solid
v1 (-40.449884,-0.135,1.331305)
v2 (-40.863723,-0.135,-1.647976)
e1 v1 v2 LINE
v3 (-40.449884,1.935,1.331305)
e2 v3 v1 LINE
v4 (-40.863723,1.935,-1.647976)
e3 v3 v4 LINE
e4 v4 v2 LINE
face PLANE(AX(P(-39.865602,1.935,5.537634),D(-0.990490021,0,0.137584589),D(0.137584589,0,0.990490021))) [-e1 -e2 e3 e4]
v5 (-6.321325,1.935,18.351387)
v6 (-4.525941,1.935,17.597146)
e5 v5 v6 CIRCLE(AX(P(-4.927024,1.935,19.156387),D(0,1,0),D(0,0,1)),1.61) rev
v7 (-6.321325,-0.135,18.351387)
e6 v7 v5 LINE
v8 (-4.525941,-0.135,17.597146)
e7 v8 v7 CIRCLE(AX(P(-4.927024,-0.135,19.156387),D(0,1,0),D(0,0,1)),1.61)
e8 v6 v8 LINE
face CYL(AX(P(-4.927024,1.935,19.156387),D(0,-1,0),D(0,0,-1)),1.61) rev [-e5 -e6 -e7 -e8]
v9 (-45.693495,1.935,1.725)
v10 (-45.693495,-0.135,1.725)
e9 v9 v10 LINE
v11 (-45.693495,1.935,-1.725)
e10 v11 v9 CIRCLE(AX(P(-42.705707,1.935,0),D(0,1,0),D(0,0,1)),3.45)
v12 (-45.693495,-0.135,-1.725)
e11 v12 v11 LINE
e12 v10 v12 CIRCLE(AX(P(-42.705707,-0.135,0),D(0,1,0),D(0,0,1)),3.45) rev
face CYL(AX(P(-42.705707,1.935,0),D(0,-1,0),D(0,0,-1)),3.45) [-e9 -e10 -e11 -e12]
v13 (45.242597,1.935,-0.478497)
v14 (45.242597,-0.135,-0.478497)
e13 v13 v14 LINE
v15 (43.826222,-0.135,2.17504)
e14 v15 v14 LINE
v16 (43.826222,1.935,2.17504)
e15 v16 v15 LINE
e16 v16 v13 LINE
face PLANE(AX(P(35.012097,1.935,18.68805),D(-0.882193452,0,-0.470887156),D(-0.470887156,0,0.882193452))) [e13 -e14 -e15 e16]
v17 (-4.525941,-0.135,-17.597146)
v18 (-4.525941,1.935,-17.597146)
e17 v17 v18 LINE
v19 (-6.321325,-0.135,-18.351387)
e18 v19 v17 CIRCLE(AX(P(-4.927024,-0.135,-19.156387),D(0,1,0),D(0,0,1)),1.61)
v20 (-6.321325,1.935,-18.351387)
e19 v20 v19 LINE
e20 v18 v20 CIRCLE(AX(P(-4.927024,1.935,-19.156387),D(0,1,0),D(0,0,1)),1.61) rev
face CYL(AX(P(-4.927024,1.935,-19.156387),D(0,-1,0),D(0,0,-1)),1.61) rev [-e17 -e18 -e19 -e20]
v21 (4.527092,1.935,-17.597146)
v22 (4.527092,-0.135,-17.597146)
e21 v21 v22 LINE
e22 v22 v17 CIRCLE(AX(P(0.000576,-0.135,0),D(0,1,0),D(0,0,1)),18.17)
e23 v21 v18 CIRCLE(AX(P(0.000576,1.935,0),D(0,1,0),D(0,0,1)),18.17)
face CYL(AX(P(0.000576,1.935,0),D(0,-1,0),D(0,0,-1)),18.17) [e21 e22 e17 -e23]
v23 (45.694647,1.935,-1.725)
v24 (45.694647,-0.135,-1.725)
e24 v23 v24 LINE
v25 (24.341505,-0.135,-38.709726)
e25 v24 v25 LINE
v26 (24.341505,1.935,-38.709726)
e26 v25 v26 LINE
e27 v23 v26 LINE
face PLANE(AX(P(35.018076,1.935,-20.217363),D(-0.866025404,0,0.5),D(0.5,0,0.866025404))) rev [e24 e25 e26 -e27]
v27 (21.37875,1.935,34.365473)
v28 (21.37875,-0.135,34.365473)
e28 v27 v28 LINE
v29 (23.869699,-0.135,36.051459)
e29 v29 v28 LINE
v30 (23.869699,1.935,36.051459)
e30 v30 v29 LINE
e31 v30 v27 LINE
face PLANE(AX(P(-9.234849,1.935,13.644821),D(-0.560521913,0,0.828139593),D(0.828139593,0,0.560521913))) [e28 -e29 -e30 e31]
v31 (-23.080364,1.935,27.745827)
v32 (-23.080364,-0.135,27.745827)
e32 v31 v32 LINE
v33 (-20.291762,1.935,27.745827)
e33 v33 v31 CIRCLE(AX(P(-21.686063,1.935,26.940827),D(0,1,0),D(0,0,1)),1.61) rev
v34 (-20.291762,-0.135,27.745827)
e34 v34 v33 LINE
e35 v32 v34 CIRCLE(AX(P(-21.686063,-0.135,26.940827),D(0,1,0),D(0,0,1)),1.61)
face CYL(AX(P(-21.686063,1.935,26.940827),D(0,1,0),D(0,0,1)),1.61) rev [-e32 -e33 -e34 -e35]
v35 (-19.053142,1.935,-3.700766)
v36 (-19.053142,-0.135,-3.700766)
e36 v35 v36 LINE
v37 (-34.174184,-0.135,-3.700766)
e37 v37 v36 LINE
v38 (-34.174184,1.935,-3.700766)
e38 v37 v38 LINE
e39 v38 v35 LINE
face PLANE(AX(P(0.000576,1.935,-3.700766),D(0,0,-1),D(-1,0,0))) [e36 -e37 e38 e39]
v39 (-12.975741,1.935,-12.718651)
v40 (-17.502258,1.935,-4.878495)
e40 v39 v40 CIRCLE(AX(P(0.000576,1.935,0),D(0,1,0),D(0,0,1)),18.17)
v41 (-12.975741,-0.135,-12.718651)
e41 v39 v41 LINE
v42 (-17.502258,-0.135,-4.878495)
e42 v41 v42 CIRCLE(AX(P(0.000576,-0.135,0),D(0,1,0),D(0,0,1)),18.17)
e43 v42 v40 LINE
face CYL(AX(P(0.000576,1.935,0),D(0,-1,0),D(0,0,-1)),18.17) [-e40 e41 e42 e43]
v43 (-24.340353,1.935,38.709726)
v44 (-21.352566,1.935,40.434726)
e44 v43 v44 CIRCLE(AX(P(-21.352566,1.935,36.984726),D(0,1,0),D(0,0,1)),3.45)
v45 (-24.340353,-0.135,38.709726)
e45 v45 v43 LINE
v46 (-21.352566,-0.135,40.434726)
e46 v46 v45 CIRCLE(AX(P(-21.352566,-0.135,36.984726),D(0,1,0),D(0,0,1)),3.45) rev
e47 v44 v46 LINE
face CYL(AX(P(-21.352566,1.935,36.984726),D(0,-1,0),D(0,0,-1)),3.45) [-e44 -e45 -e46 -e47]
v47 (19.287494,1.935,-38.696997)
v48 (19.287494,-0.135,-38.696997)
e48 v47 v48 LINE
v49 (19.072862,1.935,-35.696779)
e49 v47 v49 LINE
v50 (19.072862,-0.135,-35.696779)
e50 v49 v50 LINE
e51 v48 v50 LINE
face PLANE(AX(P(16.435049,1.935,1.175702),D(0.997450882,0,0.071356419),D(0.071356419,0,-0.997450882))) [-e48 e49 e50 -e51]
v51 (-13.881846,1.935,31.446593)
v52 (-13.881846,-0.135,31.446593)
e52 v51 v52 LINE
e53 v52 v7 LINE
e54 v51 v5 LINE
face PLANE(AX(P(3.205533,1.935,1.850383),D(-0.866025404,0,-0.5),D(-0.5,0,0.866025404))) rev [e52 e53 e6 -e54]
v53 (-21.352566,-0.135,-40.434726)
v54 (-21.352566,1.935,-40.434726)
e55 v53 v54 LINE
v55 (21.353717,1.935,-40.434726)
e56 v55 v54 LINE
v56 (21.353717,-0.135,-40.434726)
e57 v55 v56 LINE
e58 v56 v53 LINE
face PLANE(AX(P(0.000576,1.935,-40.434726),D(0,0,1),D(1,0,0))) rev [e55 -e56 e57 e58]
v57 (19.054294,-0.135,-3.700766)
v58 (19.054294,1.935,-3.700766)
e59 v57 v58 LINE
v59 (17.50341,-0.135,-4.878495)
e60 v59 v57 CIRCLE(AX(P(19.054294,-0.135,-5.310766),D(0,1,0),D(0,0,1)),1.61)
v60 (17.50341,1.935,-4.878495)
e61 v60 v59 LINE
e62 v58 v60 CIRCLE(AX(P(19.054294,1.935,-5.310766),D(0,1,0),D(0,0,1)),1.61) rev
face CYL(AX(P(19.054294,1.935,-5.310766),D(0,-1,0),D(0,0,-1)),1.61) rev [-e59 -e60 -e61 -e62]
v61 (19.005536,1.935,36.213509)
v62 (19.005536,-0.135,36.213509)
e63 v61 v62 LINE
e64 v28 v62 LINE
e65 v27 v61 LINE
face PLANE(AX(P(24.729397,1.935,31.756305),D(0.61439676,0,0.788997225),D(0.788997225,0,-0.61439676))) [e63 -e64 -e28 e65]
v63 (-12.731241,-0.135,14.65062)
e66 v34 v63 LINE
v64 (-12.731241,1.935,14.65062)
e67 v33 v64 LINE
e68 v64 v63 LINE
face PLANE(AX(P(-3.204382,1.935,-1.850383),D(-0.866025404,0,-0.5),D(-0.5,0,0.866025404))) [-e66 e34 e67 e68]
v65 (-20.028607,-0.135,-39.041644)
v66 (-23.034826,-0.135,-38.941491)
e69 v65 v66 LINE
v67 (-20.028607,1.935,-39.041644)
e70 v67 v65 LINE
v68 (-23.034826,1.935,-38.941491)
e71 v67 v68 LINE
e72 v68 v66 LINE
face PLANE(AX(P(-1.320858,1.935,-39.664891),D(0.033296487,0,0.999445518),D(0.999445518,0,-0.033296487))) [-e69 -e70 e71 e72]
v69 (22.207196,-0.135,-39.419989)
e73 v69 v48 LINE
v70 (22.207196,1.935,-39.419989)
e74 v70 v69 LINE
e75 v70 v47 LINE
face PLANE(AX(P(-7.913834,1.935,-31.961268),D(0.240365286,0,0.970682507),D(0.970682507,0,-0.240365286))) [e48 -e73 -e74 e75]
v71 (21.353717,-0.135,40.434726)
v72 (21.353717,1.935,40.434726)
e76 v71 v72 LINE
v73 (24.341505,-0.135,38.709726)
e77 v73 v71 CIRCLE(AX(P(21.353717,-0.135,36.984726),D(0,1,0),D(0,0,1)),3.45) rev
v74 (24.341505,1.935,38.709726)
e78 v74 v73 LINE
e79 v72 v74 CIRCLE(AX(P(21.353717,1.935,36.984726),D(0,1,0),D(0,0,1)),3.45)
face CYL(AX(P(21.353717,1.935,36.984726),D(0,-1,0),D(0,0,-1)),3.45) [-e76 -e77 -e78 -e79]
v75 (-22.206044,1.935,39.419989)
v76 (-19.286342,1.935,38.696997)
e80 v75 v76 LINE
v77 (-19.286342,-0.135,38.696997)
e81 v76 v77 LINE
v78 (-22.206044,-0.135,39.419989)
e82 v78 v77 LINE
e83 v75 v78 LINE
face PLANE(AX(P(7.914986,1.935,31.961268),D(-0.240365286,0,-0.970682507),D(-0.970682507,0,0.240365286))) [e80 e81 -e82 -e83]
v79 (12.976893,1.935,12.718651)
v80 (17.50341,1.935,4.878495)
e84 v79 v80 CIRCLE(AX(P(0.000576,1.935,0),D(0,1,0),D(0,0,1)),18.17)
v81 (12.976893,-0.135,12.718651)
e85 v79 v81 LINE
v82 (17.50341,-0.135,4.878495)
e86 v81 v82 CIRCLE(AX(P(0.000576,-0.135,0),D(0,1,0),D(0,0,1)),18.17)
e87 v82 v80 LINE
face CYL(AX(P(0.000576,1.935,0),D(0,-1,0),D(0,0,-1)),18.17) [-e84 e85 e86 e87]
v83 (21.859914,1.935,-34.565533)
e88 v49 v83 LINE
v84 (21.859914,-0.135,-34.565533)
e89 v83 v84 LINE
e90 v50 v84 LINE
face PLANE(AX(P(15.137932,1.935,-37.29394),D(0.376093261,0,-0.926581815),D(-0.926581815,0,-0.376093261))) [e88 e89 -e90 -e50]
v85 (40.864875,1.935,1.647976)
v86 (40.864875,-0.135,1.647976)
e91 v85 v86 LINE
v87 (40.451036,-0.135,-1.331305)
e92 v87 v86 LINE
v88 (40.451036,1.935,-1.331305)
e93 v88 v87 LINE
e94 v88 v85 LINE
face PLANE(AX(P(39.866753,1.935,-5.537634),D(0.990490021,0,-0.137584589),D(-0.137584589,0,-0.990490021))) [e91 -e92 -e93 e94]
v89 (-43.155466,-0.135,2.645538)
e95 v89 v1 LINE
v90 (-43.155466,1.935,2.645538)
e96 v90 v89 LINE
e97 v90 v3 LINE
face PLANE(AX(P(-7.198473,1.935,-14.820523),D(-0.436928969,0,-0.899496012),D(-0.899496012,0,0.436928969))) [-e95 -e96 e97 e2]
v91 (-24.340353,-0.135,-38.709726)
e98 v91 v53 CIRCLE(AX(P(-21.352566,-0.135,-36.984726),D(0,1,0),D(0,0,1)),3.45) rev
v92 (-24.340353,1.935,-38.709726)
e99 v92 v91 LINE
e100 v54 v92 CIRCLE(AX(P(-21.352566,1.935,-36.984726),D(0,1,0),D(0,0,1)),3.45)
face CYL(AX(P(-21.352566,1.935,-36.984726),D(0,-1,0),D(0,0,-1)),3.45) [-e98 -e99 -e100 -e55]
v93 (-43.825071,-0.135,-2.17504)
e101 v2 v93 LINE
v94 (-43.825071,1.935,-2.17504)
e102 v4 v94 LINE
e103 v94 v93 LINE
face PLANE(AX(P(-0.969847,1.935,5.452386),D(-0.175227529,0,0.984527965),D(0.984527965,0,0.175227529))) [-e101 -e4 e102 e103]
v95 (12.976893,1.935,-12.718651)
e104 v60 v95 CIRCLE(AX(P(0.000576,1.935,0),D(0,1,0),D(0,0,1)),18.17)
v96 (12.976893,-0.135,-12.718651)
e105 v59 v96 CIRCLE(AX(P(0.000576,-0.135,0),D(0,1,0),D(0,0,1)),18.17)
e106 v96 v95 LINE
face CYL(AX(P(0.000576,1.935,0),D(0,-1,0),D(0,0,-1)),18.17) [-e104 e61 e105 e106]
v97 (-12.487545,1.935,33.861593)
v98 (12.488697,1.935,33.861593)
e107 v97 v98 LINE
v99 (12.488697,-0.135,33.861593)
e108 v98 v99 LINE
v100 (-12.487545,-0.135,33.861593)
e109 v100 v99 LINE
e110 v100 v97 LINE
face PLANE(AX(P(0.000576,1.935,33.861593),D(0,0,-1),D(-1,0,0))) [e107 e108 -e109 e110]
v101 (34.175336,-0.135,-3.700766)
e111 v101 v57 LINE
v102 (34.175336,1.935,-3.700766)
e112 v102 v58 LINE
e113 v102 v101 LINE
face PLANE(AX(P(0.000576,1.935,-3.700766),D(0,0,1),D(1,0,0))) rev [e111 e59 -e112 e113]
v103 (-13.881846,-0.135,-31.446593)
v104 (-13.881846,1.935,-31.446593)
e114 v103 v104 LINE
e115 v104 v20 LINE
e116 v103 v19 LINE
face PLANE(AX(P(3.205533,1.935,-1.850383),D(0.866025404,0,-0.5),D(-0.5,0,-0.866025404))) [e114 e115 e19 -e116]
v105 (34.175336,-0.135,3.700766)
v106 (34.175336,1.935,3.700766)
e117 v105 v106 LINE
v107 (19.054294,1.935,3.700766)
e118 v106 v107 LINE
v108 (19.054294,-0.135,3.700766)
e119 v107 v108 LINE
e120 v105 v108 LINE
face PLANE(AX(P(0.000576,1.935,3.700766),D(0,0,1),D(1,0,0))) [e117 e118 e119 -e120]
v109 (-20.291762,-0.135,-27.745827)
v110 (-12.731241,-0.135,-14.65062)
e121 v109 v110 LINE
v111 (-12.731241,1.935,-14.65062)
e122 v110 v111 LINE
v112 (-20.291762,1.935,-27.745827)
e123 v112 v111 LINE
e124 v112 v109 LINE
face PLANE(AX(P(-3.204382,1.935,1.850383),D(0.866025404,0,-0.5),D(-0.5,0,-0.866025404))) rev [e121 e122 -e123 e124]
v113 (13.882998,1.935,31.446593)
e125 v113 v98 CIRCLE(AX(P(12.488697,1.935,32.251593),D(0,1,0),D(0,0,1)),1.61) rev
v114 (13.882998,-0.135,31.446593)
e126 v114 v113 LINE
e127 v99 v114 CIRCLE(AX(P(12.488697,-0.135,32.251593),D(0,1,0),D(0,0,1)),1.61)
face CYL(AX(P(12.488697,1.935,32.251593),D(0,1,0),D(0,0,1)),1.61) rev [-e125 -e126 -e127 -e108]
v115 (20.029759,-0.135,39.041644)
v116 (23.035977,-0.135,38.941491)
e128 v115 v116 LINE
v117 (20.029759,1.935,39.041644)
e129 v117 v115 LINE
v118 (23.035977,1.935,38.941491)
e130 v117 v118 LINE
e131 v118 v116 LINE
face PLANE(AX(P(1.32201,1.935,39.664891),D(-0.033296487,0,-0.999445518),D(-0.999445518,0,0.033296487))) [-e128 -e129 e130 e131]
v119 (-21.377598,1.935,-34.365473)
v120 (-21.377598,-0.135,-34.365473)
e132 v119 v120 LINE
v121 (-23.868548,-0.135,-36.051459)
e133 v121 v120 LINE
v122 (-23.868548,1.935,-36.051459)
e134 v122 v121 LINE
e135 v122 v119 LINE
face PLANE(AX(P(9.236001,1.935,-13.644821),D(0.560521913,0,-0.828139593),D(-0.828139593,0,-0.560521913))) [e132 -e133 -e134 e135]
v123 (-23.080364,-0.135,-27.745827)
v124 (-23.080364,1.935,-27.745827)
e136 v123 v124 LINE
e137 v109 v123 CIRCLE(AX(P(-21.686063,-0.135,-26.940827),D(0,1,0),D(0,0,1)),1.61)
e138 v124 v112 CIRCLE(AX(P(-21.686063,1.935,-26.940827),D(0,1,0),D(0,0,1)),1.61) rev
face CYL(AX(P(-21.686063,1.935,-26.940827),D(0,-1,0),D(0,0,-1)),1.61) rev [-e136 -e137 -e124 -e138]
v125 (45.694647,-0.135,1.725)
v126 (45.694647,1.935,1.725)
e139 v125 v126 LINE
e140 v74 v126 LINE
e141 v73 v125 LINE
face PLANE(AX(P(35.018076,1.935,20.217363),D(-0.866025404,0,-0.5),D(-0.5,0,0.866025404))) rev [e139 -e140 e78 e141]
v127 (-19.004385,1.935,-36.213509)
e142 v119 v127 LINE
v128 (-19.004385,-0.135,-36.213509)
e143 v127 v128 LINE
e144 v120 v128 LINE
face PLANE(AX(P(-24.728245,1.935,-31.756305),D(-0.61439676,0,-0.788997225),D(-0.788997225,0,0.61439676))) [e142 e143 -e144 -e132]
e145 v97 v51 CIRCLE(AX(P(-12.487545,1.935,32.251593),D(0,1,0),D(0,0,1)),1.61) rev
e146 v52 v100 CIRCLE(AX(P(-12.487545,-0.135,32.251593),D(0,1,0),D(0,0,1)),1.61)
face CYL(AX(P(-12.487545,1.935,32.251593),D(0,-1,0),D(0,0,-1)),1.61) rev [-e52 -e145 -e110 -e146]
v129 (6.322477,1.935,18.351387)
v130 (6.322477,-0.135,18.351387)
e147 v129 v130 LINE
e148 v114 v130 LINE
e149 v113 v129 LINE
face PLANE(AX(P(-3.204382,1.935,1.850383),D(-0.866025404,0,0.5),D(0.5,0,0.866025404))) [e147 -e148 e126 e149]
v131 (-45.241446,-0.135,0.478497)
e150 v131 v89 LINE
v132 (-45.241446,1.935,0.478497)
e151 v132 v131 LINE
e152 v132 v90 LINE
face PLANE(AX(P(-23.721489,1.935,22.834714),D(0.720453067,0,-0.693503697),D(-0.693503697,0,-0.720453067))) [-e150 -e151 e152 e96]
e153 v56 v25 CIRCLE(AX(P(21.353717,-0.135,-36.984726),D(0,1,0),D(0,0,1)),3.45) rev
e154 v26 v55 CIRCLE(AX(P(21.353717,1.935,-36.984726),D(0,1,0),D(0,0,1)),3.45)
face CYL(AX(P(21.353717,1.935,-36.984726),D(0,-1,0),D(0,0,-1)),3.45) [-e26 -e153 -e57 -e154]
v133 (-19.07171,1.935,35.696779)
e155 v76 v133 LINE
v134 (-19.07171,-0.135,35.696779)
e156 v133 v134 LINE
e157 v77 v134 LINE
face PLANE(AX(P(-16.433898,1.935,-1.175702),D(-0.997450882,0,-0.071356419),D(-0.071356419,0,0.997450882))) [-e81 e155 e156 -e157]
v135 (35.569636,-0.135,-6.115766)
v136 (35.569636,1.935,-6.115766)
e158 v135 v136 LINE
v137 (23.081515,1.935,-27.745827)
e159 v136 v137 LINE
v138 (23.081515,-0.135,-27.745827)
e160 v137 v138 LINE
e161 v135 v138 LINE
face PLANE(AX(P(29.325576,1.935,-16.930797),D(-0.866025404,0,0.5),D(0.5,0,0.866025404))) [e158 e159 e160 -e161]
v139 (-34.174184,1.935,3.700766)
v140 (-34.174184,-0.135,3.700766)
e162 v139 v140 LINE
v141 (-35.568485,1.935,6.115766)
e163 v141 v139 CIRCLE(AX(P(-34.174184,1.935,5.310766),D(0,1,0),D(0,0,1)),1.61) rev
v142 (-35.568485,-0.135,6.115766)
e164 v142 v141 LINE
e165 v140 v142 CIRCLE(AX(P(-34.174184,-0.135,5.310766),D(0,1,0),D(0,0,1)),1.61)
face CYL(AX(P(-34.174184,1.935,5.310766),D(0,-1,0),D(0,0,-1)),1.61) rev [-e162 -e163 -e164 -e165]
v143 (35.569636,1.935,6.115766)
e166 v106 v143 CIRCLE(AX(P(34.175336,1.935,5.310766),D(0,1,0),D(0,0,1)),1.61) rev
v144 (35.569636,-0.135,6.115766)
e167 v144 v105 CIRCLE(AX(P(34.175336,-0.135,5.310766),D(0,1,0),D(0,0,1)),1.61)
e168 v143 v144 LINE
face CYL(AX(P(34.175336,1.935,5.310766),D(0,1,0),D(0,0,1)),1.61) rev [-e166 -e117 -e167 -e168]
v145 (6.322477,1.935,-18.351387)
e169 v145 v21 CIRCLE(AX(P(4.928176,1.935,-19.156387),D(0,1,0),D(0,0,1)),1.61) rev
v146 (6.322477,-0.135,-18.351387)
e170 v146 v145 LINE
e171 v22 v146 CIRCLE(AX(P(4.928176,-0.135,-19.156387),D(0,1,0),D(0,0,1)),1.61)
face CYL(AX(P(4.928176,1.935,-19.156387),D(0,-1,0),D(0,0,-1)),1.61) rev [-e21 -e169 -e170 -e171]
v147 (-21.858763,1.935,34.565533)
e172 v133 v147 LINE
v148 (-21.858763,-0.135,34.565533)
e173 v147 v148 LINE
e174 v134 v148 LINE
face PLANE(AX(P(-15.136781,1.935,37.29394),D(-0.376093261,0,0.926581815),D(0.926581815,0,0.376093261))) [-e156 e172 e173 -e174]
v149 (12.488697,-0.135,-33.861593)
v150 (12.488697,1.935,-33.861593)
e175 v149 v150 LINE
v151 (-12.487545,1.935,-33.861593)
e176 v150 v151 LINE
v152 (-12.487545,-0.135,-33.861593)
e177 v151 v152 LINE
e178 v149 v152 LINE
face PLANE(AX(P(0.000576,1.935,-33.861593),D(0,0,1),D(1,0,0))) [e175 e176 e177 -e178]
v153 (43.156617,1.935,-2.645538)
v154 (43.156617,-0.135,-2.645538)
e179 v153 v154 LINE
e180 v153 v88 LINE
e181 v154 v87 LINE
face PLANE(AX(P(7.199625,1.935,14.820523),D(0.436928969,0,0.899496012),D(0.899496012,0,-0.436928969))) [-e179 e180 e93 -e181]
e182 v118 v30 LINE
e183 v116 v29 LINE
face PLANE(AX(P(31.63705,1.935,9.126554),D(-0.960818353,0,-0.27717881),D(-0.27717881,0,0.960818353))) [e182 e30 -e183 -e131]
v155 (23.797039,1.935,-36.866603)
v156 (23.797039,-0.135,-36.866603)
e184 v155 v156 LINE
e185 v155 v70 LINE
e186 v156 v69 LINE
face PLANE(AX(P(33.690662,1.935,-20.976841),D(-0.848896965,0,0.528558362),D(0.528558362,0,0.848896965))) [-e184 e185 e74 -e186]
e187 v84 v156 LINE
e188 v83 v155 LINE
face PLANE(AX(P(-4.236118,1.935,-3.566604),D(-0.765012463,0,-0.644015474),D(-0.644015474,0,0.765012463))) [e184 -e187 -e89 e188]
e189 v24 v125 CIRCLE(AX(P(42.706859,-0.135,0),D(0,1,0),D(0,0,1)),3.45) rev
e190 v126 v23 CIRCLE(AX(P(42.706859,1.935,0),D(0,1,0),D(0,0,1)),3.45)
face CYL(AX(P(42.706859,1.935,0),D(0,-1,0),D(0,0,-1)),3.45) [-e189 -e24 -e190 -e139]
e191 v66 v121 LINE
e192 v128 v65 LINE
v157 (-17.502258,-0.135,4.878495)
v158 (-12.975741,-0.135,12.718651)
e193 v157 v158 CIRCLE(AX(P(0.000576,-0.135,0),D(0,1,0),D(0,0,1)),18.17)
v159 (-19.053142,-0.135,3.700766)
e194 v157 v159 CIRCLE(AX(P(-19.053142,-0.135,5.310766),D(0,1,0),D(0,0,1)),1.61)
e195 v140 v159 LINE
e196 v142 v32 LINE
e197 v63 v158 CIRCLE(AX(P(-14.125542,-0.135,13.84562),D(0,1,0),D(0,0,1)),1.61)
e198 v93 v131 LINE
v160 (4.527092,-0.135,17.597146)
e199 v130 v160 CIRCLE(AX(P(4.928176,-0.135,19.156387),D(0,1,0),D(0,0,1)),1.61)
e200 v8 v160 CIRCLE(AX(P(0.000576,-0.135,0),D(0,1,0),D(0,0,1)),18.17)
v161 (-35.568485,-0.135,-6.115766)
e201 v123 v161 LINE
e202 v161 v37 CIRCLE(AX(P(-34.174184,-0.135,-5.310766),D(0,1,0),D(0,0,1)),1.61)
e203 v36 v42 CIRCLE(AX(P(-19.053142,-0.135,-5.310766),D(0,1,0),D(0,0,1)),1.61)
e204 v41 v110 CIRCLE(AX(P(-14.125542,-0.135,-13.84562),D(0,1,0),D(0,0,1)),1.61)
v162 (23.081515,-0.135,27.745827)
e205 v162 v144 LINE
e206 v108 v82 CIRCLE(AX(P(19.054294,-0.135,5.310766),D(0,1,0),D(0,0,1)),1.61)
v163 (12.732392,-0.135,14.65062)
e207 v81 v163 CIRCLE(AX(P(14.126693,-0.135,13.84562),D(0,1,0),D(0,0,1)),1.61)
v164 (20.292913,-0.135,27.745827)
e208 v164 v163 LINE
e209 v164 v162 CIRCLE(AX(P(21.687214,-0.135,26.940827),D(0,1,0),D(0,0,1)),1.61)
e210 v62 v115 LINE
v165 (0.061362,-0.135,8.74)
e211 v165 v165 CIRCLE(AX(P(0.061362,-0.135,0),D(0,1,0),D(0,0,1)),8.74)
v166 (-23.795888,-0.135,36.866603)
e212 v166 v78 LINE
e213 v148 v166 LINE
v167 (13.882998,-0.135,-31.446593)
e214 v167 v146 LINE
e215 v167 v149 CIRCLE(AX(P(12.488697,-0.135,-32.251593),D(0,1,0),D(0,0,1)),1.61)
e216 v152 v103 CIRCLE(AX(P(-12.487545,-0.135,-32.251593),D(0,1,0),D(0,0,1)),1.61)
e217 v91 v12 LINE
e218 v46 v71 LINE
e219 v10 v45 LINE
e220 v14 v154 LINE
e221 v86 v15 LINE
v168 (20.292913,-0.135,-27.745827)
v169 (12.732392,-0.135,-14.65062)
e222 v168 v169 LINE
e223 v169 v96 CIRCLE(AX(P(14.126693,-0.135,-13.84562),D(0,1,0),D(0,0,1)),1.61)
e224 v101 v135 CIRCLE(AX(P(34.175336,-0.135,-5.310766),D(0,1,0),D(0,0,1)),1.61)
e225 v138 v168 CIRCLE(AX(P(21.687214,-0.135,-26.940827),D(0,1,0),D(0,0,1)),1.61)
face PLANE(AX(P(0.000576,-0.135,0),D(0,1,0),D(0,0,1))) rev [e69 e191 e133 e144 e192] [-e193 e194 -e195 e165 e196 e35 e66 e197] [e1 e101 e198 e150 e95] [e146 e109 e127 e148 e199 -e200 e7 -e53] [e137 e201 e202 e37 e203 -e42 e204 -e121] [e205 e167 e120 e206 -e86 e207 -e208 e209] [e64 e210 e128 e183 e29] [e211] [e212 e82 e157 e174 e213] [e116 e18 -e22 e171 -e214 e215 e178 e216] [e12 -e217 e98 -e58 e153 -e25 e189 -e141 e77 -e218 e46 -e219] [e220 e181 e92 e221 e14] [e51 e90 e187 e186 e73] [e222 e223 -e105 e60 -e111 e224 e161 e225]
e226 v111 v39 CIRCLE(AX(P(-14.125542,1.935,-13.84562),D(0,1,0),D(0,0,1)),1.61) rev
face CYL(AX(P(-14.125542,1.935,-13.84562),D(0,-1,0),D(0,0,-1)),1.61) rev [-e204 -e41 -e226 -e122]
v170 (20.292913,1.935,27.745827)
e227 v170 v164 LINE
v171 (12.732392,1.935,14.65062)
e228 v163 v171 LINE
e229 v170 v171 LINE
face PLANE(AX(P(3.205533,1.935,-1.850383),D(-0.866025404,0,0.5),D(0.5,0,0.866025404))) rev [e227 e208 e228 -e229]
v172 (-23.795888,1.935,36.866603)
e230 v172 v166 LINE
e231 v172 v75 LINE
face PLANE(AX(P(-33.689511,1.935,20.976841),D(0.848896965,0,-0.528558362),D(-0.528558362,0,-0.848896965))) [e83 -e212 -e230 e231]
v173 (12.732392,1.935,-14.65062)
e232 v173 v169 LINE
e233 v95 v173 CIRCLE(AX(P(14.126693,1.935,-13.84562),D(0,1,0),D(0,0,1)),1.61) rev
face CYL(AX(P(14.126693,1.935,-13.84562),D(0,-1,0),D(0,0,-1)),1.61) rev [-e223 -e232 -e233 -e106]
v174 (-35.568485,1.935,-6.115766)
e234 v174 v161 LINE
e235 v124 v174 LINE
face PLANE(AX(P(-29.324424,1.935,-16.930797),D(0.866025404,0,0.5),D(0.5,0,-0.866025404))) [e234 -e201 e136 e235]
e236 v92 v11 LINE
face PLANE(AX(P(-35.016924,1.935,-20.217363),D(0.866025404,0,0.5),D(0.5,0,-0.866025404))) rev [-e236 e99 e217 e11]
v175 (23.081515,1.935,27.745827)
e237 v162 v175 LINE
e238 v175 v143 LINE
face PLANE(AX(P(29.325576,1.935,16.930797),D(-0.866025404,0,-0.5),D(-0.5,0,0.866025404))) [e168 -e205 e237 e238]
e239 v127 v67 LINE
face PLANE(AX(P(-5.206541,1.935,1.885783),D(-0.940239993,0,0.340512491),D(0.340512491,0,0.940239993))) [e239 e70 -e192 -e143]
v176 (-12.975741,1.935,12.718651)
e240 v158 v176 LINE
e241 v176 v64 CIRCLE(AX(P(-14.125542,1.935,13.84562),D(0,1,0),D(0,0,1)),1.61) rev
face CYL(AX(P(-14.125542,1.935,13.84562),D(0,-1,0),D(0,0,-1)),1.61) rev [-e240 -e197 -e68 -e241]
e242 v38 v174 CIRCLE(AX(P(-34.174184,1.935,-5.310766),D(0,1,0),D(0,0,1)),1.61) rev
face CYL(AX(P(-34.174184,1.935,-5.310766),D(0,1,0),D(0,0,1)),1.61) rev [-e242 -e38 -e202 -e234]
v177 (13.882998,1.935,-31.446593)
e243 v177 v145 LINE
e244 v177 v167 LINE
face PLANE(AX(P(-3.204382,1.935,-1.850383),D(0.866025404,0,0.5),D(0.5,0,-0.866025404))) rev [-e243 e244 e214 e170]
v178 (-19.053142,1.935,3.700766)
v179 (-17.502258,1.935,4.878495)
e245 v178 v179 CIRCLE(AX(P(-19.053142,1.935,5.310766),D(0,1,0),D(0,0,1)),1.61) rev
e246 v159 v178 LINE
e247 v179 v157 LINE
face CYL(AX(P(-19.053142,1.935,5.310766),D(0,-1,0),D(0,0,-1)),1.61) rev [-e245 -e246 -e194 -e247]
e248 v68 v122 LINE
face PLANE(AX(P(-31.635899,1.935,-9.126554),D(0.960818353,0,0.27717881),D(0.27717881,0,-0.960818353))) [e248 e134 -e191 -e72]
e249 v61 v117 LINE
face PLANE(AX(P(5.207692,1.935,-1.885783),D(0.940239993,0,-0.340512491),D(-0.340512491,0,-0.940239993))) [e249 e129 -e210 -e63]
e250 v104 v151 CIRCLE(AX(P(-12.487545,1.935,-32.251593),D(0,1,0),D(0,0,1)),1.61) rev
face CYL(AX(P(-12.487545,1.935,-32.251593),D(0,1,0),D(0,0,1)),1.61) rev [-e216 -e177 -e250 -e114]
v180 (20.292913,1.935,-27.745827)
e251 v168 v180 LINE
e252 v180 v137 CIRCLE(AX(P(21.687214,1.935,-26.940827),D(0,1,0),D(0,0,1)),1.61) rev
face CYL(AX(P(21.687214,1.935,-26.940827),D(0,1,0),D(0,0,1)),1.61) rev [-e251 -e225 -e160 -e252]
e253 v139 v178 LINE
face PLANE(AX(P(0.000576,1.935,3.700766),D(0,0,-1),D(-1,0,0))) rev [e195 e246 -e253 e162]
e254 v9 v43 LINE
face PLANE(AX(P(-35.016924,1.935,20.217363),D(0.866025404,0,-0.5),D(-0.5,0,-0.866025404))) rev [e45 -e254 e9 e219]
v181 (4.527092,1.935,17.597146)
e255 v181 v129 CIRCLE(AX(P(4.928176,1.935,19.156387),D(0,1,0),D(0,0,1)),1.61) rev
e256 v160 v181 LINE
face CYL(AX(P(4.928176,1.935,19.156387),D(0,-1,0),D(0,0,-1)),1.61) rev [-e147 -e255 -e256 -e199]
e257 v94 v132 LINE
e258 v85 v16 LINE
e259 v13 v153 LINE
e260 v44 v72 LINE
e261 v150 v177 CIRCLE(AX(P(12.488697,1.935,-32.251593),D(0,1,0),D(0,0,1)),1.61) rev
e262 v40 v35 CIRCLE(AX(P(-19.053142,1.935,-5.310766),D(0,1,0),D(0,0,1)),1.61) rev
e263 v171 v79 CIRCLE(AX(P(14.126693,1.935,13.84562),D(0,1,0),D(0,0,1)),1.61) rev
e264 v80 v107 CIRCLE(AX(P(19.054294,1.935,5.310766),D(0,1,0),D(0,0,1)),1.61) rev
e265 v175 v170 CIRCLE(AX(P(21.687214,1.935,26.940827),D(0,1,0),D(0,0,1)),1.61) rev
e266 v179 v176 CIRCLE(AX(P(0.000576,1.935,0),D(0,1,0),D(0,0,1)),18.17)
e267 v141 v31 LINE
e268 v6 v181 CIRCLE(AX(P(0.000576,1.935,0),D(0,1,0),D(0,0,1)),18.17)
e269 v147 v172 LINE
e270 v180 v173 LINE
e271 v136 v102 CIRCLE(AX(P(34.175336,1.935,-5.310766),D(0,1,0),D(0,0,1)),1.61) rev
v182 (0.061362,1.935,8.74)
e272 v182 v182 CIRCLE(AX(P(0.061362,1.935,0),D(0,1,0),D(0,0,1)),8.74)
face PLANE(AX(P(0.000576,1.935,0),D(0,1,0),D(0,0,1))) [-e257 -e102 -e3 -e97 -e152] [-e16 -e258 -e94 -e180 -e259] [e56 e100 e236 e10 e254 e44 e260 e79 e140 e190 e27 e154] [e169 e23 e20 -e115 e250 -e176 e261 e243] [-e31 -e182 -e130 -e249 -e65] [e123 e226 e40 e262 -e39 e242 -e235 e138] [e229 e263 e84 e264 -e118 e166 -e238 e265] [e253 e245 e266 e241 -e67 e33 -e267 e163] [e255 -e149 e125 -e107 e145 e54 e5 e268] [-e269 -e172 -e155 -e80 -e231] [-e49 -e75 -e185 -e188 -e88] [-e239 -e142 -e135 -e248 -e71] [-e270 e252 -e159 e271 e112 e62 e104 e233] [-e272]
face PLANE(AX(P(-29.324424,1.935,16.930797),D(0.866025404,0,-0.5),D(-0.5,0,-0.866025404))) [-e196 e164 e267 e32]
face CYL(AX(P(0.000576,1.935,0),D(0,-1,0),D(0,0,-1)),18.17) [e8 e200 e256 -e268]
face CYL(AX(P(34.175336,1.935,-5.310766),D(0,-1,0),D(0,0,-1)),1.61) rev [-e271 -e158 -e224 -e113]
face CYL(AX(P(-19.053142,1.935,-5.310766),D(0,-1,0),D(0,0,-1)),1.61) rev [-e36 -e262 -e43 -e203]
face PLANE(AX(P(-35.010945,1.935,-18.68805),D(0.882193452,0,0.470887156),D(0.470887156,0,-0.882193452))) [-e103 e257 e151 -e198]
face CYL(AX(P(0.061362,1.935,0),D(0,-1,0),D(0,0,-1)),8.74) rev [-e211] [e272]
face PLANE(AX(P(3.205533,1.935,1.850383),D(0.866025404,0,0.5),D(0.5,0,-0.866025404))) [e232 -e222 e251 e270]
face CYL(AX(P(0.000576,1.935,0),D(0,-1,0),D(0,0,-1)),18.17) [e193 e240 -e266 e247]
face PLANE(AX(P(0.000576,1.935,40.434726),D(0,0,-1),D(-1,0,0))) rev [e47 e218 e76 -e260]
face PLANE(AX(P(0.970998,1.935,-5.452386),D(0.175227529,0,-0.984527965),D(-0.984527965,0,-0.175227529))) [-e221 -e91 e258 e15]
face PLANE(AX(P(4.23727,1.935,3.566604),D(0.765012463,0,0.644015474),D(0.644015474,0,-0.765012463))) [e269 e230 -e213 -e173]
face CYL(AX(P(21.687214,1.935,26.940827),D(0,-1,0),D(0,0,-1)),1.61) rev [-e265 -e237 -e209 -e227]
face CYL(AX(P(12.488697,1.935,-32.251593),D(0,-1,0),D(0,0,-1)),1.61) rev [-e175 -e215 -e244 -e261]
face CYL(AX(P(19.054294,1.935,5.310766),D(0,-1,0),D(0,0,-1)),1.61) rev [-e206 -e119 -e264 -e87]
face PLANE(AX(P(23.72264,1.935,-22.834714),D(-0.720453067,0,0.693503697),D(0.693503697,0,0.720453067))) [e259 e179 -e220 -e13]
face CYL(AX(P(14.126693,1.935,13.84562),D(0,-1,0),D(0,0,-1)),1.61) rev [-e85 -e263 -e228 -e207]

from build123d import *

# Parameters (mm, degrees)
SKETCH1_R           = 7.6
BOSS_EXTRUDE1_DEPTH = 1.8
FILLET1_R           = 3
FILLET2_R           = 1.4
SCALE1_SCALE        = 1.15


with BuildPart() as part:
    # Sketch1 → Boss-Extrude1 (new body)
    with BuildSketch(Plane(origin=(0, 0, 0), x_dir=(1, 0, 0), z_dir=(0, 1, 0))):
        Polygon((20.3, 35.160631394), (-20.3, 35.160631394), (-40.6, 0), (-20.3, -35.160631394), (20.3, -35.160631394), (40.6, 0), align=None)
        Polygon((-16.584596387, -31.040676977), (-16.771232891, -33.649562724), (-19.310104532, -34.278250893), (-20.692576995, -32.057915803), (-19.008120326, -30.056985082), align=None, mode=Mode.SUBTRACT)
        Polygon((-35.174313007, -1.157656706), (-37.526992591, -2.300467626), (-39.340888337, -0.416084372), (-38.109257976, 1.891339446), (-35.534172805, 1.433022539), align=None, mode=Mode.SUBTRACT)
        Polygon((18.589716619, -29.883020272), (20.7557597, -31.349095098), (20.030783805, -33.862166521), (17.41668098, -33.94925525), (16.52605248, -31.490007621), align=None, mode=Mode.SUBTRACT)
        with BuildLine():
            Line((-32.142053523, 3.218057696), (-18.857946477, 26.226806032))
            Line((-18.857946477, 26.226806032), (-10.521325069, 11.78735419))
            ThreePointArc((-10.521325069, 11.78735419), (-13.68320138, 7.9), (-15.468810706, 3.218057696))
            Line((-15.468810706, 3.218057696), (-32.142053523, 3.218057696))
        make_face(mode=Mode.SUBTRACT)
        with BuildLine():
            Line((-18.857946477, -26.226806032), (-32.142053523, -3.218057696))
            Line((-32.142053523, -3.218057696), (-15.468810706, -3.218057696))
            ThreePointArc((-15.468810706, -3.218057696), (-13.68320138, -7.9), (-10.521325069, -11.78735419))
            Line((-10.521325069, -11.78735419), (-18.857946477, -26.226806032))
        make_face(mode=Mode.SUBTRACT)
        with BuildLine():
            Line((13.284107046, -29.444863729), (-13.284107046, -29.444863729))
            Line((-13.284107046, -29.444863729), (-4.947485637, -15.005411886))
            ThreePointArc((-4.947485637, -15.005411886), (0, -15.8), (4.947485637, -15.005411886))
            Line((4.947485637, -15.005411886), (13.284107046, -29.444863729))
        make_face(mode=Mode.SUBTRACT)
        with BuildLine():
            Line((32.142053523, -3.218057696), (18.857946477, -26.226806032))
            Line((18.857946477, -26.226806032), (10.521325069, -11.78735419))
            ThreePointArc((10.521325069, -11.78735419), (13.68320138, -7.9), (15.468810706, -3.218057696))
            Line((15.468810706, -3.218057696), (32.142053523, -3.218057696))
        make_face(mode=Mode.SUBTRACT)
        with BuildLine():
            Line((18.857946477, 26.226806032), (32.142053523, 3.218057696))
            Line((32.142053523, 3.218057696), (15.468810706, 3.218057696))
            ThreePointArc((15.468810706, 3.218057696), (13.68320138, 7.9), (10.521325069, 11.78735419))
            Line((10.521325069, 11.78735419), (18.857946477, 26.226806032))
        make_face(mode=Mode.SUBTRACT)
        with BuildLine():
            Line((-13.284107046, 29.444863729), (13.284107046, 29.444863729))
            Line((13.284107046, 29.444863729), (4.947485637, 15.005411886))
            ThreePointArc((4.947485637, 15.005411886), (0, 15.8), (-4.947485637, 15.005411886))
            Line((-4.947485637, 15.005411886), (-13.284107046, 29.444863729))
        make_face(mode=Mode.SUBTRACT)
        Polygon((-18.589716619, 29.883020272), (-20.7557597, 31.349095098), (-20.030783805, 33.862166521), (-17.41668098, 33.94925525), (-16.52605248, 31.490007621), align=None, mode=Mode.SUBTRACT)
        Polygon((35.174313007, 1.157656706), (37.526992591, 2.300467626), (39.340888337, 0.416084372), (38.109257976, -1.891339446), (35.534172805, -1.433022539), align=None, mode=Mode.SUBTRACT)
        Polygon((16.584596387, 31.040676977), (16.771232891, 33.649562724), (19.310104532, 34.278250893), (20.692576995, 32.057915803), (19.008120326, 30.056985082), align=None, mode=Mode.SUBTRACT)
        with Locations(Location((0.052857117, 0, 0), (0, 0, 270))):
            Circle(SKETCH1_R, mode=Mode.SUBTRACT)
    extrude(amount=BOSS_EXTRUDE1_DEPTH)

    # Fillet1
    # the kernel refuses this fillet: 3 mm, written as the material it takes off along each edge
    with BuildSketch(Plane(origin=(40.6, -4.330127019, 0), x_dir=(-0.4999999999998131, 0, -0.8660254037845465), z_dir=(0, 1, 0))) as fillet1_piece_1:
        with BuildLine():
            CenterArc((FILLET1_R * 0.577350269186, FILLET1_R), FILLET1_R, 210, 60)
            Line((-FILLET1_R * 0.288675134596, FILLET1_R * 0.499999999995), (0, 0))
            Line((0, 0), (FILLET1_R * 0.577350269186, 0))
        make_face()
    extrude(amount=10.460254038, mode=Mode.SUBTRACT)
    with BuildSketch(Plane(origin=(20.3, -4.330127019, 35.160631394), x_dir=(-1.0, 0, -2.4203690345734148e-12), z_dir=(0, 1, 0)), Plane(origin=(-20.3, -4.330127019, 35.160631394), x_dir=(-0.5000000000021431, 0, -0.8660254037832013), z_dir=(0, 1, 0)), Plane(origin=(-40.6, -4.330127019, 0), x_dir=(0.49999999999780936, 0, -0.8660254037857034), z_dir=(0, 1, 0)), Plane(origin=(-20.3, -4.330127019, -35.160631394), x_dir=(1, 0, 0), z_dir=(0, 1, 0)), Plane(origin=(20.3, -4.330127019, -35.160631394), x_dir=(0.49999999999981115, 0, 0.8660254037845477), z_dir=(0, 1, 0))) as fillet1_piece_2:
        with BuildLine():
            CenterArc((FILLET1_R * 0.577350269195, -FILLET1_R), FILLET1_R, 90, 60)
            Line((-FILLET1_R * 0.288675134594, -FILLET1_R * 0.500000000007), (0, 0))
            Line((0, 0), (FILLET1_R * 0.577350269195, 0))
        make_face()
    extrude(amount=10.460254038, mode=Mode.SUBTRACT)

    # Fillet2
    fillet2_edges = [part.edges().sort_by_distance(p)[0] for p in [
        (-32.142053523, 0.9, -3.218057696),
        (-15.468810706, 0.9, -3.218057696),
        (-10.521325069, 0.9, -11.78735419),
        (-18.857946477, 0.9, -26.226806032),
        (-18.857946477, 0.9, 26.226806032),
        (-10.521325069, 0.9, 11.78735419),
        (-15.468810706, 0.9, 3.218057696),
        (-32.142053523, 0.9, 3.218057696),
        (13.284107046, 0.9, 29.444863729),
        (4.947485637, 0.9, 15.005411886),
        (-4.947485637, 0.9, 15.005411886),
        (-13.284107046, 0.9, 29.444863729),
        (32.142053523, 0.9, 3.218057696),
        (15.468810706, 0.9, 3.218057696),
        (10.521325069, 0.9, 11.78735419),
        (18.857946477, 0.9, 26.226806032),
        (18.857946477, 0.9, -26.226806032),
        (10.521325069, 0.9, -11.78735419),
        (15.468810706, 0.9, -3.218057696),
        (32.142053523, 0.9, -3.218057696),
        (-13.284107046, 0.9, -29.444863729),
        (-4.947485637, 0.9, -15.005411886),
        (4.947485637, 0.9, -15.005411886),
        (13.284107046, 0.9, -29.444863729),
    ]]
    fillet(fillet2_edges, radius=FILLET2_R)


with BuildPart() as part_1:
    # Scale1: scaled about (-0.00383883, 0.9, 0)
    add(part.part.scale(SCALE1_SCALE).moved(Location((0.000575824, -0.135, 0))))


solid = part_1.part
